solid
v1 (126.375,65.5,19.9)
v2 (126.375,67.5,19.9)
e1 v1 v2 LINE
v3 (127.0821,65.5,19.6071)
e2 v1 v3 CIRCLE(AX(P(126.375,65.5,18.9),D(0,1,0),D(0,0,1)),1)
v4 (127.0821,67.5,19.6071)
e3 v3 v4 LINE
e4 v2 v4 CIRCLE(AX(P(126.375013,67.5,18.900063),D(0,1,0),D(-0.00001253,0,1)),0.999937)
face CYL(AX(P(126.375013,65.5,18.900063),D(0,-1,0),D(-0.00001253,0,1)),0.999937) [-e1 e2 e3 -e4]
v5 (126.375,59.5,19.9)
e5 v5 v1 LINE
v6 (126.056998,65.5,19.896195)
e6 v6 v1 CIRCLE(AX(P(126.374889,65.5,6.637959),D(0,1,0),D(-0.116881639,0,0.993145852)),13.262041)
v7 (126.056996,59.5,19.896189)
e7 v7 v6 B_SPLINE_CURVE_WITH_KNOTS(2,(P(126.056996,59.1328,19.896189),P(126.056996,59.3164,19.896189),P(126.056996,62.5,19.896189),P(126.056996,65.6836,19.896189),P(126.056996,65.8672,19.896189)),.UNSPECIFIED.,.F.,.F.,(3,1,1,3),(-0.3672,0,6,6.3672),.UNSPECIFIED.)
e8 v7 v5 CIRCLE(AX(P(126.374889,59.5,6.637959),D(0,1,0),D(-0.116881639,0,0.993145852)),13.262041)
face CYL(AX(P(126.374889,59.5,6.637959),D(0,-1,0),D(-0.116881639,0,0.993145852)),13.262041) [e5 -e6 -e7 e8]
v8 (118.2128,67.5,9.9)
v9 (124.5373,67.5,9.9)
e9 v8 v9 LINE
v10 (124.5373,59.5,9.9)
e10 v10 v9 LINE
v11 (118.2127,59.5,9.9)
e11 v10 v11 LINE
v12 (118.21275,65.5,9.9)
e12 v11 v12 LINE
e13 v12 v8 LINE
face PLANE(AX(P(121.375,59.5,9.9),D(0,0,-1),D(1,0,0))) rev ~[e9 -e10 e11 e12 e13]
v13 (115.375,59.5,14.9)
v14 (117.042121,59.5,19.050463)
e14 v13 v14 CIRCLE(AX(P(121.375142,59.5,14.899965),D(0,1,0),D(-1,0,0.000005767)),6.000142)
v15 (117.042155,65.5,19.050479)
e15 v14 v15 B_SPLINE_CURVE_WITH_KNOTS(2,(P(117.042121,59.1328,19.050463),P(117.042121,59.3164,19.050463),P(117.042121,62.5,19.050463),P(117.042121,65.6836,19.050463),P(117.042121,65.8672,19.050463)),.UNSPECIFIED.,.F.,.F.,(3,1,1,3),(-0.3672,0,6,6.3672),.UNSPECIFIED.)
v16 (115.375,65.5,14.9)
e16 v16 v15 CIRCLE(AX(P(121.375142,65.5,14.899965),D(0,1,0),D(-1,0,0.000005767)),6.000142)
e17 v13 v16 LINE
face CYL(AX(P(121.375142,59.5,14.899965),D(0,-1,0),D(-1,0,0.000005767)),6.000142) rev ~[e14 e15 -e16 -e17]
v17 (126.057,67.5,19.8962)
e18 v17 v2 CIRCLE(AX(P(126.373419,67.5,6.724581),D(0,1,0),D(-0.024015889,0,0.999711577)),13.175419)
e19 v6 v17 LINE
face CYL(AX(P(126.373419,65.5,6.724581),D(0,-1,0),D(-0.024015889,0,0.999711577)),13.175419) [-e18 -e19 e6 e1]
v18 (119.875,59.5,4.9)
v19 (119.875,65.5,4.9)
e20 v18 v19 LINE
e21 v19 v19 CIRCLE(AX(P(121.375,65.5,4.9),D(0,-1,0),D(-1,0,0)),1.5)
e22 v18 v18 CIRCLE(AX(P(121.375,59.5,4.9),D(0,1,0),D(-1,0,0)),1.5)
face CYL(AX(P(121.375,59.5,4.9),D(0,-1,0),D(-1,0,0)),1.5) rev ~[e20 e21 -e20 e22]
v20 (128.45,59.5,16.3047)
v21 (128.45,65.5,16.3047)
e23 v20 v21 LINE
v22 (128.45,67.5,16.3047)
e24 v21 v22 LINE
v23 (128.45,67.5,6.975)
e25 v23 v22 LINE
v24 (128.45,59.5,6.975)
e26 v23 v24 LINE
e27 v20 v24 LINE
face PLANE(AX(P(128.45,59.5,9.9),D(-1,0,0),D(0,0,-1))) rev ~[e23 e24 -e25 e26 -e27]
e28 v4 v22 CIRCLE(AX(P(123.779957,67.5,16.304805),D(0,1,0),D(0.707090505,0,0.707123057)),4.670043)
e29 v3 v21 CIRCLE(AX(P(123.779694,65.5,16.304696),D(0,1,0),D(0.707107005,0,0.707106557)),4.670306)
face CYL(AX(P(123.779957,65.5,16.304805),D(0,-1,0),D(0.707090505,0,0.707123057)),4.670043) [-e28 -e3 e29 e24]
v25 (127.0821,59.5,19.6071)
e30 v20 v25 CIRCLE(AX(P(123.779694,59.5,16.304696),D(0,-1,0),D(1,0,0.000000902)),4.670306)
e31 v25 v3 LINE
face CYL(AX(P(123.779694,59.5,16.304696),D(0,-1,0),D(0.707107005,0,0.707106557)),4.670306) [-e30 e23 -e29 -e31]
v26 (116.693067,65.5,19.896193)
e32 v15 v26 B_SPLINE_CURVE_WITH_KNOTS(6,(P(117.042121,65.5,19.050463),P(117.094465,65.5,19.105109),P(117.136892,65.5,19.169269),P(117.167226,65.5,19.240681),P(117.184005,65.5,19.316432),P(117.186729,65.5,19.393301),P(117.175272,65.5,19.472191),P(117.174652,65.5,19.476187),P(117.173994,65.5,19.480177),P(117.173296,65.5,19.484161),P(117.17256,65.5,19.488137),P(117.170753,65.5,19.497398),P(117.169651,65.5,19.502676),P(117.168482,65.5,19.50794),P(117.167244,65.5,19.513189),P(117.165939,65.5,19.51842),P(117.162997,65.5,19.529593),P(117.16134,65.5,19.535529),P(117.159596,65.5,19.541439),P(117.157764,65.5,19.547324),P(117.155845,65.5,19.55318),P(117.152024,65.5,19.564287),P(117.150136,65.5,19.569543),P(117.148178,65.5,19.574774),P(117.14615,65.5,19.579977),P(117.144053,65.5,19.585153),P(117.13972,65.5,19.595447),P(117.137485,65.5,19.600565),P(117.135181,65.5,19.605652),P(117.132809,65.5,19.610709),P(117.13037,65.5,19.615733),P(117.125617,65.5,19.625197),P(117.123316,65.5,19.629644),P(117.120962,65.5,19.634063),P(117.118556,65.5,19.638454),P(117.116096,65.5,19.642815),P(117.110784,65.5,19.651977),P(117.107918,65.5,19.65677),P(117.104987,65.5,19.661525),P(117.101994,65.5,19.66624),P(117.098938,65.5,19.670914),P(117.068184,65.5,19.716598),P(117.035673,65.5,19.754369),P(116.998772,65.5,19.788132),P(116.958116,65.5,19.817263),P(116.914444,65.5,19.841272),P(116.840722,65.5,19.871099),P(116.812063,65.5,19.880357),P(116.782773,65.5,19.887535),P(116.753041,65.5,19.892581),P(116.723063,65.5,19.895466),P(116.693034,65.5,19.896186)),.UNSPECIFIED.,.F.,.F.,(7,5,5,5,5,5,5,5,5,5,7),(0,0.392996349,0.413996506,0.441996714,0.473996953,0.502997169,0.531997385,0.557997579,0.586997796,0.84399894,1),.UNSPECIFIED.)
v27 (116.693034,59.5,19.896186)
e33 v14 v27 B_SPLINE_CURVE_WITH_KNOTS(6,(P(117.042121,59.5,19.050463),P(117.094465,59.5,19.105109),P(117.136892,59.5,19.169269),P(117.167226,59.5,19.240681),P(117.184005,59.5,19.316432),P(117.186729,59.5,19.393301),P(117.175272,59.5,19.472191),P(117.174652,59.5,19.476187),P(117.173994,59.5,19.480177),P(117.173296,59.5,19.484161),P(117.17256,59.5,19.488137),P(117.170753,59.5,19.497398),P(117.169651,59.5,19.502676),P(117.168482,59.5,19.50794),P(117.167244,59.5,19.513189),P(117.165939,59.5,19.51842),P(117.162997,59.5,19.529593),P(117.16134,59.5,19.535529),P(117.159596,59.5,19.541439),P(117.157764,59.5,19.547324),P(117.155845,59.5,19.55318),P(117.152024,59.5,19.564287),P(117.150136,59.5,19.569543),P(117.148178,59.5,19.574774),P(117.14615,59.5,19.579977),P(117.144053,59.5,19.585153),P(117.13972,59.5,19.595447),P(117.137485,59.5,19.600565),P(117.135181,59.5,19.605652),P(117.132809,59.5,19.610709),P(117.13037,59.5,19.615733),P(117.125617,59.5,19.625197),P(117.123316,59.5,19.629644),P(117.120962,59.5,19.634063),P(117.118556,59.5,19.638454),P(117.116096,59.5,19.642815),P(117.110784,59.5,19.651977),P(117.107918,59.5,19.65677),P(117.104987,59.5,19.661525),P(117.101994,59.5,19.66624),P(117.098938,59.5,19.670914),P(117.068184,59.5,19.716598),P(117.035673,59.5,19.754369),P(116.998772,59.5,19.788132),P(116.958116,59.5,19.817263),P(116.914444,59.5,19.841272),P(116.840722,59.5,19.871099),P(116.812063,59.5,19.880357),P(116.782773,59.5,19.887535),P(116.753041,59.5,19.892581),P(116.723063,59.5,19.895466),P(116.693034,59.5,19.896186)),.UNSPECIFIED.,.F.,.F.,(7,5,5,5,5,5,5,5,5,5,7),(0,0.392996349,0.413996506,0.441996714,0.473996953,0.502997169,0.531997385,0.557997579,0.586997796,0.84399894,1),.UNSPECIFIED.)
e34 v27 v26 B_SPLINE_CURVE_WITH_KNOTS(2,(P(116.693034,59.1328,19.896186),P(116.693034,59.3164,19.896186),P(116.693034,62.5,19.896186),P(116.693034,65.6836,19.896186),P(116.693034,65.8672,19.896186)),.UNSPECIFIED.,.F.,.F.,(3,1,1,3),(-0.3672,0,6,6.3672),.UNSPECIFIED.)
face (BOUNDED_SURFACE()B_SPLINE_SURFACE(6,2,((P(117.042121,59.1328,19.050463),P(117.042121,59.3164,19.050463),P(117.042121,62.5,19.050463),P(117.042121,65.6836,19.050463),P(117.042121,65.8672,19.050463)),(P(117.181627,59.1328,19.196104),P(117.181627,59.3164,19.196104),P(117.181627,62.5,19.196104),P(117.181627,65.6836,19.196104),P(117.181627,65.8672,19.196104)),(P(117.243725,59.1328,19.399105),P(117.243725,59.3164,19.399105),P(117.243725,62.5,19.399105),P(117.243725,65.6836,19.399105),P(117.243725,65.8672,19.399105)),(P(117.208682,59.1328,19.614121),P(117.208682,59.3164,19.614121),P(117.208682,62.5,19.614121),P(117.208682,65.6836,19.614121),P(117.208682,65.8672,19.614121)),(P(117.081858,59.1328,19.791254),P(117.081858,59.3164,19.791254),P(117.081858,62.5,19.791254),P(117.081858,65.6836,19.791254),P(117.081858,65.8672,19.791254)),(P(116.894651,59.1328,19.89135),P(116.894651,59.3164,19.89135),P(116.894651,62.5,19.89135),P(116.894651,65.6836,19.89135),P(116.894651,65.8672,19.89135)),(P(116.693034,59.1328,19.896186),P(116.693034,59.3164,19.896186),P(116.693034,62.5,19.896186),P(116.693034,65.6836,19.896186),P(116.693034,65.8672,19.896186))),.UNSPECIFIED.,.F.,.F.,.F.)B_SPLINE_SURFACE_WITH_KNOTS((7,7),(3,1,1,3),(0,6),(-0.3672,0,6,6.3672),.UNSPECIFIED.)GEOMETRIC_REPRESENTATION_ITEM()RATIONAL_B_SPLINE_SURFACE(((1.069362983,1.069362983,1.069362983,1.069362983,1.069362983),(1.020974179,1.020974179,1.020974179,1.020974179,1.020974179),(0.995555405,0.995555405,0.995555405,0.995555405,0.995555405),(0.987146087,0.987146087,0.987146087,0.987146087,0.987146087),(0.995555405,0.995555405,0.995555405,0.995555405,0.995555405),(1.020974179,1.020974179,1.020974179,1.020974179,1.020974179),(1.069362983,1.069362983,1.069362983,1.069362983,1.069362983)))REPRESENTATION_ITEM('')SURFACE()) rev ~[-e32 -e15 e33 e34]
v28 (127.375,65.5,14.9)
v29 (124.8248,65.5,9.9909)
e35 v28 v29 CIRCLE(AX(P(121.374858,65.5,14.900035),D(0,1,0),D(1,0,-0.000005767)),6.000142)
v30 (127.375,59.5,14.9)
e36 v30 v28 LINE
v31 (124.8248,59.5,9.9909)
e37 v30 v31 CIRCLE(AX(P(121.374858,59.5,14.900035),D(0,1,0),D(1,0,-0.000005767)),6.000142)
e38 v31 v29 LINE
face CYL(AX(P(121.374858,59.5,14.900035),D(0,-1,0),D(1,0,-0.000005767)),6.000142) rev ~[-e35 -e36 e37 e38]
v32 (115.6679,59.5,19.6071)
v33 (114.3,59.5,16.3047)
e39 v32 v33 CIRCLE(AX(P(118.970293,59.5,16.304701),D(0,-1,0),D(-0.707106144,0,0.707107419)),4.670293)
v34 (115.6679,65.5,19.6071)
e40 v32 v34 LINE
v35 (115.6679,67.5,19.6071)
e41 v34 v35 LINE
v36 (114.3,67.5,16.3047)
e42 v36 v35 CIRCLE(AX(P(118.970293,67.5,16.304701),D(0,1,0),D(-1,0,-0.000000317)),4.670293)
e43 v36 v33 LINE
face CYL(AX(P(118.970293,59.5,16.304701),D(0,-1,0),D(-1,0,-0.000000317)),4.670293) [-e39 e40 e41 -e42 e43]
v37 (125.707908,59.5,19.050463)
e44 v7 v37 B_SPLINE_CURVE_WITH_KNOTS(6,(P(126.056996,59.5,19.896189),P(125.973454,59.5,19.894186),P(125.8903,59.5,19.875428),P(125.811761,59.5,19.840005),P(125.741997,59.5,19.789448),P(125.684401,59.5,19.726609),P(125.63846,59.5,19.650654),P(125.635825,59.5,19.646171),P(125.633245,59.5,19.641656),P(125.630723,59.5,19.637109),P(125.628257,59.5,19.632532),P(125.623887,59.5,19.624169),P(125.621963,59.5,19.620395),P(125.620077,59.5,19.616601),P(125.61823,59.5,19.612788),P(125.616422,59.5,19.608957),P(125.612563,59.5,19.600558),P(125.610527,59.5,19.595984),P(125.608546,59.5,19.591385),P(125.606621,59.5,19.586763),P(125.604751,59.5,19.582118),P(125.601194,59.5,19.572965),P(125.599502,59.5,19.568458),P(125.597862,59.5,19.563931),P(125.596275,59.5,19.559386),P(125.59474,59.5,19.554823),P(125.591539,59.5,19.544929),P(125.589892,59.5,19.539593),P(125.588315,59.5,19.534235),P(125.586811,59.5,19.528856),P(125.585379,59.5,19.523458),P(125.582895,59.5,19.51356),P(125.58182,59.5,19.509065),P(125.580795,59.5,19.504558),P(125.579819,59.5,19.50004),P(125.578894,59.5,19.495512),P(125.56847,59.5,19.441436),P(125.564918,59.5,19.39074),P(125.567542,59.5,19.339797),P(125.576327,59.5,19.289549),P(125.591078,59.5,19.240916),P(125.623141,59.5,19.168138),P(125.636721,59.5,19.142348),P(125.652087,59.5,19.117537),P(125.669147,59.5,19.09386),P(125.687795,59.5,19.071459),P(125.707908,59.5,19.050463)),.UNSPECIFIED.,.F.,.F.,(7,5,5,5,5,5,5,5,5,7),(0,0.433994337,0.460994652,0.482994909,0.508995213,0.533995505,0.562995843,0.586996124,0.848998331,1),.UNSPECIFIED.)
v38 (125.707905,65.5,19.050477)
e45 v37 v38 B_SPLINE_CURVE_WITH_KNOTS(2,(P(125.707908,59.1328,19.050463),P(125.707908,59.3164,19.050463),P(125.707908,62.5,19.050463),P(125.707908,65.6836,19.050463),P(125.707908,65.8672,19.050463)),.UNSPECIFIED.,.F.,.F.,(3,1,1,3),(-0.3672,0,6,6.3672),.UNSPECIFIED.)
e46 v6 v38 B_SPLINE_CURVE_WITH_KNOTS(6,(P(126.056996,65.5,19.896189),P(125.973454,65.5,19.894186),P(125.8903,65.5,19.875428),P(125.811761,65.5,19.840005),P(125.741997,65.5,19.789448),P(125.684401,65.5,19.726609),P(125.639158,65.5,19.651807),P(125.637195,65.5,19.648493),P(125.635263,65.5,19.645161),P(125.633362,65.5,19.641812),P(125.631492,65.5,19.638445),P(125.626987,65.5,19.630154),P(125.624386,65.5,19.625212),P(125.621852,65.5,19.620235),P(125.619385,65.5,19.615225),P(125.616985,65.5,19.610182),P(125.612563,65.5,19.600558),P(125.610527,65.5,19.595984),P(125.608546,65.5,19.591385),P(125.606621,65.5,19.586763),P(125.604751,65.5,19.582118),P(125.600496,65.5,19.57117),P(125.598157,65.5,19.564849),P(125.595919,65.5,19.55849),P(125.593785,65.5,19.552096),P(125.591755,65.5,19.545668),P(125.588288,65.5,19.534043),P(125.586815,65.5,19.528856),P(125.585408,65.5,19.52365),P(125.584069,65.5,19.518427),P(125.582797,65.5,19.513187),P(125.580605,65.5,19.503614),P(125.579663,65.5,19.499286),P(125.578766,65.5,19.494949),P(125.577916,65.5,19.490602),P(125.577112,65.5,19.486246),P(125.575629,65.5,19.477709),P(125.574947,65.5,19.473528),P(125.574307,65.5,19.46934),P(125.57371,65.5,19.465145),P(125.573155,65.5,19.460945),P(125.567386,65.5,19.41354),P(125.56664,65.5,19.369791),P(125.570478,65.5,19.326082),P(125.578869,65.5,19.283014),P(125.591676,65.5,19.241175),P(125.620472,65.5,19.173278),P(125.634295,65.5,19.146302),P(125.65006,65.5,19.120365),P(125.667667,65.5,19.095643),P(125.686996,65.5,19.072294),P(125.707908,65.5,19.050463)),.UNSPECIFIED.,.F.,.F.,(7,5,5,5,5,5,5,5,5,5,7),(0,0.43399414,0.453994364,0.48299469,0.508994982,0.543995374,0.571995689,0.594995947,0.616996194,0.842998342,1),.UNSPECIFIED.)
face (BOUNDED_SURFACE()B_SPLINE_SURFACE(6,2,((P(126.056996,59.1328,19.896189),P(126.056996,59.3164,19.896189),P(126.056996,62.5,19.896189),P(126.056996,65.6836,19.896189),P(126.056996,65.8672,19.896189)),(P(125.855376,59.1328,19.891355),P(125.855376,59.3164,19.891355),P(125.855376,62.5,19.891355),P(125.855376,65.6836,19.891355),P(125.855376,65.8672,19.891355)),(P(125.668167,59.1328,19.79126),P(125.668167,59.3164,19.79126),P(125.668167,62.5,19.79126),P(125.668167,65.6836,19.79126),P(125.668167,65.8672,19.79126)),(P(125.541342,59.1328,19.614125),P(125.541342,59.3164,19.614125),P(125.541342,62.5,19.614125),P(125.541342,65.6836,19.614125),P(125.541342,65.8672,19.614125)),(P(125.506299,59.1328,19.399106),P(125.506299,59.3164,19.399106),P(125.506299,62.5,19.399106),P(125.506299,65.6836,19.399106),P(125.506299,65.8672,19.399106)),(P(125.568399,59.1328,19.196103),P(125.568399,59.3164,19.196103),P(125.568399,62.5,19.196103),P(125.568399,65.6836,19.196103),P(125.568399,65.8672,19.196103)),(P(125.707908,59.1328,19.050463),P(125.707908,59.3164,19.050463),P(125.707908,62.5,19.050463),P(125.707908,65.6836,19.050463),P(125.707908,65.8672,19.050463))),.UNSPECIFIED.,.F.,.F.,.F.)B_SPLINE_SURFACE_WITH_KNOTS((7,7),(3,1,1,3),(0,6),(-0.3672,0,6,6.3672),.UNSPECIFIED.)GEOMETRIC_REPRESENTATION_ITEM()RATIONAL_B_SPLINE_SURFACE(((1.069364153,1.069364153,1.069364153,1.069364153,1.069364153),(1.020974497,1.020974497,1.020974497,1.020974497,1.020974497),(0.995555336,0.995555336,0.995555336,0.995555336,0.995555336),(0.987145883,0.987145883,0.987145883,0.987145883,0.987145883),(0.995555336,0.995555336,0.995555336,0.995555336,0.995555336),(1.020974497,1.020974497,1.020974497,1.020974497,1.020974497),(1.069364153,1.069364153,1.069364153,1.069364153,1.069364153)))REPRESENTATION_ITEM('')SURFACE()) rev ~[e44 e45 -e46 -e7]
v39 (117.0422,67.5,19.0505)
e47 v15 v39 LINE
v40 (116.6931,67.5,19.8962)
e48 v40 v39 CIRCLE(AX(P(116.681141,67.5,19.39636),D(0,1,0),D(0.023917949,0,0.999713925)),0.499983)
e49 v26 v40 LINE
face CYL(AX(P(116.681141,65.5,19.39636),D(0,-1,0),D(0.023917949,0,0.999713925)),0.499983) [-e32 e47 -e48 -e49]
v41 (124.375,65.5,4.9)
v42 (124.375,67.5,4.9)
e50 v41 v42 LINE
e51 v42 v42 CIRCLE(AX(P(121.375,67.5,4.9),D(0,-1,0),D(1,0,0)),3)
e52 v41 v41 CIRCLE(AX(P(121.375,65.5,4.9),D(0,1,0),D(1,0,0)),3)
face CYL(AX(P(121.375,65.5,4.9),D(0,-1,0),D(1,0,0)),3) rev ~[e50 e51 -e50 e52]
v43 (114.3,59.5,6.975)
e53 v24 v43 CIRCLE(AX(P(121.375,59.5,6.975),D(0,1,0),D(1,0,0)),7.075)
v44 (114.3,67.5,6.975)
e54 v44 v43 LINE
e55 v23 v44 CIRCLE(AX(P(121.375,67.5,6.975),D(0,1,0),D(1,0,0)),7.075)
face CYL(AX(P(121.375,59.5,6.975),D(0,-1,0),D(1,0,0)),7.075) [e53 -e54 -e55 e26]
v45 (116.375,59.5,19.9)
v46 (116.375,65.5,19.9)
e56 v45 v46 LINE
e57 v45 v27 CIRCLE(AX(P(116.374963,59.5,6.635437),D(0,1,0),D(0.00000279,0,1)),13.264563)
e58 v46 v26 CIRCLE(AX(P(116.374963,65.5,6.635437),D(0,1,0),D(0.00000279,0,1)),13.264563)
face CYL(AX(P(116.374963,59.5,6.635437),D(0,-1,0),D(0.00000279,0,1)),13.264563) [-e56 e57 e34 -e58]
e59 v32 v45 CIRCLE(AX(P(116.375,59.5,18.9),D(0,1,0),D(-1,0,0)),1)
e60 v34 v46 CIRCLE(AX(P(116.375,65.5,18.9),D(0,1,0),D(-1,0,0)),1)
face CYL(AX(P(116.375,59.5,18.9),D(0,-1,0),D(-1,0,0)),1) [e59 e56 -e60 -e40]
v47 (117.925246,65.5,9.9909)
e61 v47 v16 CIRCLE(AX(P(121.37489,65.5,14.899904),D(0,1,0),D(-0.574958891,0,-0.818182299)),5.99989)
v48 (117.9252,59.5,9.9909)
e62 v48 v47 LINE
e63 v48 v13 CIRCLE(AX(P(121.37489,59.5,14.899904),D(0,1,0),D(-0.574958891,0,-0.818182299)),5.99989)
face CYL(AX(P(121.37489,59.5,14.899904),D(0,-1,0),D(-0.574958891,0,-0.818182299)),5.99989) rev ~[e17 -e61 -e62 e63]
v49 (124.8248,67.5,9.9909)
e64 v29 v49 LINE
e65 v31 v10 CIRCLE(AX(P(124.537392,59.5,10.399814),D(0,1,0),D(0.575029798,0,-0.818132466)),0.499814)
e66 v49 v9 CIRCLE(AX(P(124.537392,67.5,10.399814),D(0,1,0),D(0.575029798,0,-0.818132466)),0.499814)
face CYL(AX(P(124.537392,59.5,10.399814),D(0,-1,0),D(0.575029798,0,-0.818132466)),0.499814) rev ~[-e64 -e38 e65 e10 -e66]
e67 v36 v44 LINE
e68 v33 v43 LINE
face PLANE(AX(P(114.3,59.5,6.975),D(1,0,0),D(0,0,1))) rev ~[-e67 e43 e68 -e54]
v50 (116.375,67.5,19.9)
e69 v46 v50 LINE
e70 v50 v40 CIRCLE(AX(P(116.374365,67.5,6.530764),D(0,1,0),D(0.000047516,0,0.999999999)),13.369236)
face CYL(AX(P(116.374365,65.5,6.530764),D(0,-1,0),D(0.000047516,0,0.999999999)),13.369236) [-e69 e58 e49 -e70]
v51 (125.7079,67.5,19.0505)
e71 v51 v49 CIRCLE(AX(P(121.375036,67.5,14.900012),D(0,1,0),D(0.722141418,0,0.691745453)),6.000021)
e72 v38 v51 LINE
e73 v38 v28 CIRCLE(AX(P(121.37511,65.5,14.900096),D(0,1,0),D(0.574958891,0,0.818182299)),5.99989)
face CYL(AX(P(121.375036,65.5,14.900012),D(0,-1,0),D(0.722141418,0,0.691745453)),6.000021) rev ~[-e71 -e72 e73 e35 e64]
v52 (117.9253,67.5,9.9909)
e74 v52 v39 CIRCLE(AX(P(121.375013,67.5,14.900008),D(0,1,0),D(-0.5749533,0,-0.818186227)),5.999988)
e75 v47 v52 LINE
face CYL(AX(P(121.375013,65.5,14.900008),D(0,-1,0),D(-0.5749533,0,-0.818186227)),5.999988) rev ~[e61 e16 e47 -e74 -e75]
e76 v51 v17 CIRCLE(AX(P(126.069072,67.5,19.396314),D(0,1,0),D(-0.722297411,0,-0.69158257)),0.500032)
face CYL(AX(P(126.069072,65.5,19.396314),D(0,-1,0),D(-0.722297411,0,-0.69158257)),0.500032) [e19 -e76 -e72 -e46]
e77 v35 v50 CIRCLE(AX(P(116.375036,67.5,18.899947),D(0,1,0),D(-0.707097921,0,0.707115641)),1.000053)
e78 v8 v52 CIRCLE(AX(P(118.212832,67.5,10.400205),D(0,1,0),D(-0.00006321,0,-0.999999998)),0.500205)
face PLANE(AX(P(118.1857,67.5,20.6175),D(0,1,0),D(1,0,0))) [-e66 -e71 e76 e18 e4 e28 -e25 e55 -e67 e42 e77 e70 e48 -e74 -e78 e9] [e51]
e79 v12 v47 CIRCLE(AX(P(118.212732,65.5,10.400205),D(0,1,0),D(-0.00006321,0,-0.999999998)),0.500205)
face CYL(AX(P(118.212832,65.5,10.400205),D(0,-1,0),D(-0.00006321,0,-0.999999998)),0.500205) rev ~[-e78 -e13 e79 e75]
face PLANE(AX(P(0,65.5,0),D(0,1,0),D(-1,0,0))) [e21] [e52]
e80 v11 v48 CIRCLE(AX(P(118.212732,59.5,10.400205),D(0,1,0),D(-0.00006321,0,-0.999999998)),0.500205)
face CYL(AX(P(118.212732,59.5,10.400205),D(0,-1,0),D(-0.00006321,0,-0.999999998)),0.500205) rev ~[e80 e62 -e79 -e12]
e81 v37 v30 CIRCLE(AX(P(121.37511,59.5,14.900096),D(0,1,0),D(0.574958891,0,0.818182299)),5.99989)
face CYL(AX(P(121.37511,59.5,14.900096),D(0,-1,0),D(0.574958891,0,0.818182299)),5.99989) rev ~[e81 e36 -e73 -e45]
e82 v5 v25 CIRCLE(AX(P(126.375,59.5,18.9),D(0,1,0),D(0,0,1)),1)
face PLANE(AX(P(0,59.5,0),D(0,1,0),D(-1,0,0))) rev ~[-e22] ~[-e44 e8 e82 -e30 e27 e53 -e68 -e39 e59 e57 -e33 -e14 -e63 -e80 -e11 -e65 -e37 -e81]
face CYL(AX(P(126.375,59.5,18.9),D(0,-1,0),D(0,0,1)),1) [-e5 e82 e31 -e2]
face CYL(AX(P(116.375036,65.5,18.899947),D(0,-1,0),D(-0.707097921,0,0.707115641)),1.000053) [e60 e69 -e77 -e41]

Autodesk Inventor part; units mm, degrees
ref_plane "YZ Plane" through (0, 0, 0) normal (1, 0, 0) x (0, 1, 0)
ref_plane "XZ Plane" through (0, 0, 0) normal (0, 1, 0) x (-1, 0, 0)
sketch "Sketch1" plane through (0, 0, 0) normal (0, 1, 0) x (-1, 0, 0)
  line L0 (-113.9895, -20.65) -> (-113.9895, -0.1) projected
  line L1 (-105.9, -20.65) -> (-113.9895, -20.65) projected
  line L2 (-105.9, -20.65) -> (-105.9, -19.5) projected
  line L3 (-105.9, -19.5) -> (-112.525, -19.5) projected
  line L4 (-112.525, -19.5) -> (-112.525, 19.5) projected
  line L5 (-112.525, 19.5) -> (-73.775, 19.5) projected
  line L6 (-127.45, 19.9) -> (-115.3, 19.9) projected
  line L7 (-115.3, 19.9) -> (-115.3, 9.9) projected
  line L8 (-115.3, 9.9) -> (-127.45, 9.9) projected
  line L9 (-127.45, 9.9) -> (-127.45, 19.9) projected
  line L10 (-124.5373, 9.9) -> (-126.375, 9.9) projected
  arc A0 (-124.8248, 9.9909) -> (-124.5373, 9.9) centre (-124.5373, 10.4) ccw projected
  arc A1 (-127.375, 14.9) -> (-124.8248, 9.9909) centre (-121.375, 14.9) ccw projected
  line L11 (-127.375, 10.9) -> (-127.375, 14.9) projected
  arc A2 (-127.375, 10.9) -> (-126.375, 9.9) centre (-126.375, 10.9) ccw projected
  line L12 (-127.375, 14.9) -> (-127.375, 18.9) projected
  arc A3 (-124.8248, 19.8091) -> (-127.375, 14.9) centre (-121.375, 14.9) ccw projected
  arc A4 (-124.5373, 19.9) -> (-124.8248, 19.8091) centre (-124.5373, 19.4) ccw projected
  line L13 (-126.375, 19.9) -> (-124.5373, 19.9) projected
  arc A5 (-126.375, 19.9) -> (-127.375, 18.9) centre (-126.375, 18.9) ccw projected
  line L14 (-118.2127, 19.9) -> (-116.375, 19.9) projected
  arc A6 (-117.9252, 19.8091) -> (-118.2127, 19.9) centre (-118.2127, 19.4) ccw projected
  arc A7 (-115.375, 14.9) -> (-117.9252, 19.8091) centre (-121.375, 14.9) ccw projected
  line L15 (-115.375, 18.9) -> (-115.375, 14.9) projected
  arc A8 (-115.375, 18.9) -> (-116.375, 19.9) centre (-116.375, 18.9) ccw projected
  line L16 (-115.375, 14.9) -> (-115.375, 10.9) projected
  arc A9 (-117.9252, 9.9909) -> (-115.375, 14.9) centre (-121.375, 14.9) ccw projected
  arc A10 (-118.2127, 9.9) -> (-117.9252, 9.9909) centre (-118.2127, 10.4) ccw projected
  line L17 (-116.375, 9.9) -> (-118.2127, 9.9) projected
  arc A11 (-116.375, 9.9) -> (-115.375, 10.9) centre (-116.375, 10.9) ccw projected
  arc A12 (-118.2127, 9.9) -> (-117.9252, 9.9909) centre (-118.2127, 10.4) ccw projected
  arc A13 (-117.9252, 9.9909) -> (-117.9252, 19.8091) centre (-121.375, 14.9) ccw projected
  arc A14 (-117.9252, 19.8091) -> (-118.2127, 19.9) centre (-118.2127, 19.4) ccw projected
  line L18 (-118.2127, 19.9) -> (-124.5373, 19.9) projected
  arc A15 (-124.5373, 19.9) -> (-124.8248, 19.8091) centre (-124.5373, 19.4) ccw projected
  arc A16 (-124.8248, 19.8091) -> (-124.8248, 9.9909) centre (-121.375, 14.9) ccw projected
  arc A17 (-124.8248, 9.9909) -> (-124.5373, 9.9) centre (-124.5373, 10.4) ccw projected
  line L19 (-124.5373, 9.9) -> (-118.2127, 9.9) projected
  line L20 (-73.775, 19.5) -> (-73.775, 20.65) projected
  line L21 (-115.3, 19.9) -> (-115.3, 9.9)
  line L22 (-115.3, 9.9) -> (-114.3, 9.9)
  line L23 (-114.3, 9.9) -> (-114.3, 19.9)
  line L24 (-114.3, 19.9) -> (-115.3, 19.9)
  line L25 (-121.375, 14.9) -> (-121.375, 19.9)
  arc A18 (-114.3, 16.3047) -> (-115.6679, 19.6071) centre (-118.9703, 16.3047) ccw
  arc A19 (-116.375, 19.9) -> (-117.9252, 19.8091) centre (-116.375, 6.6367) ccw
  line L26 (-127.45, 19.9) -> (-127.45, 9.9)
  line L27 (-127.45, 9.9) -> (-128.45, 9.9)
  line L28 (-128.45, 9.9) -> (-128.45, 19.9)
  line L29 (-128.45, 19.9) -> (-127.45, 19.9)
  arc A20 (-127.0821, 19.6071) -> (-128.45, 16.3047) centre (-123.7797, 16.3047) ccw
  arc A21 (-124.8248, 19.8091) -> (-126.375, 19.9) centre (-126.375, 6.6367) ccw
  line L30 (-114.3, 9.9) -> (-128.45, 9.9)
  line L31 (-128.45, 9.9) -> (-128.45, -0.1)
  line L32 (-128.45, -0.1) -> (-114.3, -0.1)
  line L33 (-114.3, -0.1) -> (-114.3, 9.9)
  line L34 (-121.375, 9.9) -> (-121.375, -0.1)
  circle A22 centre (-121.375, 4.9) radius 1.5
  circle A23 centre (-121.375, 4.9) radius 3
  arc A24 (-121.375, -0.1) -> (-114.3, 6.975) centre (-121.375, 6.975) ccw
  arc A25 (-128.45, 6.975) -> (-121.375, -0.1) centre (-121.375, 6.975) ccw
  line L35 (-128.9145, -0.1) -> (-128.9145, 20.65) projected
  line L36 (-128.9145, -0.1) -> (-113.9895, -0.1) projected
  line L37 (-128.9145, 20.65) -> (-73.775, 20.65) projected
  circle A26 centre (-121.375, 4.9163) radius 1.4375 projected
  point P0 (0, 0)
  point P1 (-135.6645, 14.9)
  dimension "d18" = 1
  dimension "d20" = 3
  dimension "d21" = 6
  dimension "d22" = 10
ref_plane "Work Plane1" through (127.45, 59.5, 9.9) normal (0, 1, 0) x (1, 0, 0)
extrude "Extrusion1" add sketch "Sketch1" along normal blind 6 from surface at 59.5 contours A25 L31 L27 L8 L34 A23 | L34 A23 L8 L22 L33 A24 | A23 L34 A22 | L34 A22 A23 | L22 L7 A18 L23 | L28 A20 L9 L27 | L8 A11 L16 L15 A8 A18 L7 | L9 A20 A5 L12 L11 A2 L8 | L8 A10 A9 L16 A11 | L8 A2 L11 A1 A0 | A8 L15 A7 A19 | A5 A21 A3 L12
fillet "Fillet1" radius 0.5 2 edges at (117.9252, 62.5, 19.8091) (124.8248, 62.5, 19.8091)
sketch "Sketch2" plane through (118.1857, 65.5, 20.6175) normal (0, 1, 0) x (1, 0, 0)
  arc A0 (-0.2604, 10.6266) -> (-1.1435, 1.567) centre (3.1893, 5.7175) ccw projected
  arc A1 (0.0271, 10.7175) -> (-0.2604, 10.6266) centre (0.0271, 10.2175) ccw projected
  line L0 (6.3516, 10.7175) -> (0.0271, 10.7175) projected
  arc A2 (6.6391, 10.6266) -> (6.3516, 10.7175) centre (6.3516, 10.2175) ccw projected
  arc A3 (7.5222, 1.567) -> (6.6391, 10.6266) centre (3.1893, 5.7175) ccw projected
  circle A4 centre (3.1893, 15.7175) radius 3
  arc A5 (10.2643, 13.6425) -> (-3.8857, 13.6425) centre (3.1893, 13.6425) ccw projected
  line L1 (-3.8857, 4.3128) -> (-3.8857, 13.6425) projected
  arc A6 (-3.8857, 4.3128) -> (-2.5178, 1.0104) centre (0.7846, 4.3128) ccw projected
  arc A7 (-2.5178, 1.0104) -> (-1.8107, 0.7175) centre (-1.8107, 1.7175) ccw projected
  arc A8 (-1.8107, 0.7175) -> (-1.4926, 0.7213) centre (-1.8107, 13.9808) ccw projected
  arc A9 (7.8713, 0.7213) -> (8.1893, 0.7175) centre (8.1893, 13.9808) ccw projected
  arc A10 (8.1893, 0.7175) -> (8.8964, 1.0104) centre (8.1893, 1.7175) ccw projected
  arc A11 (8.8964, 1.0104) -> (10.2643, 4.3128) centre (5.5941, 4.3128) ccw projected
  line L2 (10.2643, 13.6425) -> (10.2643, 4.3128) projected
  line L3 (3.1893, 10.7175) -> (3.1893, 20.7175)
  arc A12 (7.5222, 1.567) -> (7.8713, 0.7213) centre (7.8833, 1.2212) ccw projected
  arc A13 (-1.4926, 0.7213) -> (-1.1435, 1.567) centre (-1.5046, 1.2212) ccw projected
  point P0 (-118.1857, 20.6175)
  dimension "d10" = 6
extrude "Extrusion2" add sketch "Sketch2" along normal blind 2 contours A0 A13 A8 A7 A6 L1 A5 L3 A4 L0 A1 | L3 A4 A5 L2 A11 A10 A9 A12 A3 A2 L0
properties part number "Z Stage Motor Clamp V5"
